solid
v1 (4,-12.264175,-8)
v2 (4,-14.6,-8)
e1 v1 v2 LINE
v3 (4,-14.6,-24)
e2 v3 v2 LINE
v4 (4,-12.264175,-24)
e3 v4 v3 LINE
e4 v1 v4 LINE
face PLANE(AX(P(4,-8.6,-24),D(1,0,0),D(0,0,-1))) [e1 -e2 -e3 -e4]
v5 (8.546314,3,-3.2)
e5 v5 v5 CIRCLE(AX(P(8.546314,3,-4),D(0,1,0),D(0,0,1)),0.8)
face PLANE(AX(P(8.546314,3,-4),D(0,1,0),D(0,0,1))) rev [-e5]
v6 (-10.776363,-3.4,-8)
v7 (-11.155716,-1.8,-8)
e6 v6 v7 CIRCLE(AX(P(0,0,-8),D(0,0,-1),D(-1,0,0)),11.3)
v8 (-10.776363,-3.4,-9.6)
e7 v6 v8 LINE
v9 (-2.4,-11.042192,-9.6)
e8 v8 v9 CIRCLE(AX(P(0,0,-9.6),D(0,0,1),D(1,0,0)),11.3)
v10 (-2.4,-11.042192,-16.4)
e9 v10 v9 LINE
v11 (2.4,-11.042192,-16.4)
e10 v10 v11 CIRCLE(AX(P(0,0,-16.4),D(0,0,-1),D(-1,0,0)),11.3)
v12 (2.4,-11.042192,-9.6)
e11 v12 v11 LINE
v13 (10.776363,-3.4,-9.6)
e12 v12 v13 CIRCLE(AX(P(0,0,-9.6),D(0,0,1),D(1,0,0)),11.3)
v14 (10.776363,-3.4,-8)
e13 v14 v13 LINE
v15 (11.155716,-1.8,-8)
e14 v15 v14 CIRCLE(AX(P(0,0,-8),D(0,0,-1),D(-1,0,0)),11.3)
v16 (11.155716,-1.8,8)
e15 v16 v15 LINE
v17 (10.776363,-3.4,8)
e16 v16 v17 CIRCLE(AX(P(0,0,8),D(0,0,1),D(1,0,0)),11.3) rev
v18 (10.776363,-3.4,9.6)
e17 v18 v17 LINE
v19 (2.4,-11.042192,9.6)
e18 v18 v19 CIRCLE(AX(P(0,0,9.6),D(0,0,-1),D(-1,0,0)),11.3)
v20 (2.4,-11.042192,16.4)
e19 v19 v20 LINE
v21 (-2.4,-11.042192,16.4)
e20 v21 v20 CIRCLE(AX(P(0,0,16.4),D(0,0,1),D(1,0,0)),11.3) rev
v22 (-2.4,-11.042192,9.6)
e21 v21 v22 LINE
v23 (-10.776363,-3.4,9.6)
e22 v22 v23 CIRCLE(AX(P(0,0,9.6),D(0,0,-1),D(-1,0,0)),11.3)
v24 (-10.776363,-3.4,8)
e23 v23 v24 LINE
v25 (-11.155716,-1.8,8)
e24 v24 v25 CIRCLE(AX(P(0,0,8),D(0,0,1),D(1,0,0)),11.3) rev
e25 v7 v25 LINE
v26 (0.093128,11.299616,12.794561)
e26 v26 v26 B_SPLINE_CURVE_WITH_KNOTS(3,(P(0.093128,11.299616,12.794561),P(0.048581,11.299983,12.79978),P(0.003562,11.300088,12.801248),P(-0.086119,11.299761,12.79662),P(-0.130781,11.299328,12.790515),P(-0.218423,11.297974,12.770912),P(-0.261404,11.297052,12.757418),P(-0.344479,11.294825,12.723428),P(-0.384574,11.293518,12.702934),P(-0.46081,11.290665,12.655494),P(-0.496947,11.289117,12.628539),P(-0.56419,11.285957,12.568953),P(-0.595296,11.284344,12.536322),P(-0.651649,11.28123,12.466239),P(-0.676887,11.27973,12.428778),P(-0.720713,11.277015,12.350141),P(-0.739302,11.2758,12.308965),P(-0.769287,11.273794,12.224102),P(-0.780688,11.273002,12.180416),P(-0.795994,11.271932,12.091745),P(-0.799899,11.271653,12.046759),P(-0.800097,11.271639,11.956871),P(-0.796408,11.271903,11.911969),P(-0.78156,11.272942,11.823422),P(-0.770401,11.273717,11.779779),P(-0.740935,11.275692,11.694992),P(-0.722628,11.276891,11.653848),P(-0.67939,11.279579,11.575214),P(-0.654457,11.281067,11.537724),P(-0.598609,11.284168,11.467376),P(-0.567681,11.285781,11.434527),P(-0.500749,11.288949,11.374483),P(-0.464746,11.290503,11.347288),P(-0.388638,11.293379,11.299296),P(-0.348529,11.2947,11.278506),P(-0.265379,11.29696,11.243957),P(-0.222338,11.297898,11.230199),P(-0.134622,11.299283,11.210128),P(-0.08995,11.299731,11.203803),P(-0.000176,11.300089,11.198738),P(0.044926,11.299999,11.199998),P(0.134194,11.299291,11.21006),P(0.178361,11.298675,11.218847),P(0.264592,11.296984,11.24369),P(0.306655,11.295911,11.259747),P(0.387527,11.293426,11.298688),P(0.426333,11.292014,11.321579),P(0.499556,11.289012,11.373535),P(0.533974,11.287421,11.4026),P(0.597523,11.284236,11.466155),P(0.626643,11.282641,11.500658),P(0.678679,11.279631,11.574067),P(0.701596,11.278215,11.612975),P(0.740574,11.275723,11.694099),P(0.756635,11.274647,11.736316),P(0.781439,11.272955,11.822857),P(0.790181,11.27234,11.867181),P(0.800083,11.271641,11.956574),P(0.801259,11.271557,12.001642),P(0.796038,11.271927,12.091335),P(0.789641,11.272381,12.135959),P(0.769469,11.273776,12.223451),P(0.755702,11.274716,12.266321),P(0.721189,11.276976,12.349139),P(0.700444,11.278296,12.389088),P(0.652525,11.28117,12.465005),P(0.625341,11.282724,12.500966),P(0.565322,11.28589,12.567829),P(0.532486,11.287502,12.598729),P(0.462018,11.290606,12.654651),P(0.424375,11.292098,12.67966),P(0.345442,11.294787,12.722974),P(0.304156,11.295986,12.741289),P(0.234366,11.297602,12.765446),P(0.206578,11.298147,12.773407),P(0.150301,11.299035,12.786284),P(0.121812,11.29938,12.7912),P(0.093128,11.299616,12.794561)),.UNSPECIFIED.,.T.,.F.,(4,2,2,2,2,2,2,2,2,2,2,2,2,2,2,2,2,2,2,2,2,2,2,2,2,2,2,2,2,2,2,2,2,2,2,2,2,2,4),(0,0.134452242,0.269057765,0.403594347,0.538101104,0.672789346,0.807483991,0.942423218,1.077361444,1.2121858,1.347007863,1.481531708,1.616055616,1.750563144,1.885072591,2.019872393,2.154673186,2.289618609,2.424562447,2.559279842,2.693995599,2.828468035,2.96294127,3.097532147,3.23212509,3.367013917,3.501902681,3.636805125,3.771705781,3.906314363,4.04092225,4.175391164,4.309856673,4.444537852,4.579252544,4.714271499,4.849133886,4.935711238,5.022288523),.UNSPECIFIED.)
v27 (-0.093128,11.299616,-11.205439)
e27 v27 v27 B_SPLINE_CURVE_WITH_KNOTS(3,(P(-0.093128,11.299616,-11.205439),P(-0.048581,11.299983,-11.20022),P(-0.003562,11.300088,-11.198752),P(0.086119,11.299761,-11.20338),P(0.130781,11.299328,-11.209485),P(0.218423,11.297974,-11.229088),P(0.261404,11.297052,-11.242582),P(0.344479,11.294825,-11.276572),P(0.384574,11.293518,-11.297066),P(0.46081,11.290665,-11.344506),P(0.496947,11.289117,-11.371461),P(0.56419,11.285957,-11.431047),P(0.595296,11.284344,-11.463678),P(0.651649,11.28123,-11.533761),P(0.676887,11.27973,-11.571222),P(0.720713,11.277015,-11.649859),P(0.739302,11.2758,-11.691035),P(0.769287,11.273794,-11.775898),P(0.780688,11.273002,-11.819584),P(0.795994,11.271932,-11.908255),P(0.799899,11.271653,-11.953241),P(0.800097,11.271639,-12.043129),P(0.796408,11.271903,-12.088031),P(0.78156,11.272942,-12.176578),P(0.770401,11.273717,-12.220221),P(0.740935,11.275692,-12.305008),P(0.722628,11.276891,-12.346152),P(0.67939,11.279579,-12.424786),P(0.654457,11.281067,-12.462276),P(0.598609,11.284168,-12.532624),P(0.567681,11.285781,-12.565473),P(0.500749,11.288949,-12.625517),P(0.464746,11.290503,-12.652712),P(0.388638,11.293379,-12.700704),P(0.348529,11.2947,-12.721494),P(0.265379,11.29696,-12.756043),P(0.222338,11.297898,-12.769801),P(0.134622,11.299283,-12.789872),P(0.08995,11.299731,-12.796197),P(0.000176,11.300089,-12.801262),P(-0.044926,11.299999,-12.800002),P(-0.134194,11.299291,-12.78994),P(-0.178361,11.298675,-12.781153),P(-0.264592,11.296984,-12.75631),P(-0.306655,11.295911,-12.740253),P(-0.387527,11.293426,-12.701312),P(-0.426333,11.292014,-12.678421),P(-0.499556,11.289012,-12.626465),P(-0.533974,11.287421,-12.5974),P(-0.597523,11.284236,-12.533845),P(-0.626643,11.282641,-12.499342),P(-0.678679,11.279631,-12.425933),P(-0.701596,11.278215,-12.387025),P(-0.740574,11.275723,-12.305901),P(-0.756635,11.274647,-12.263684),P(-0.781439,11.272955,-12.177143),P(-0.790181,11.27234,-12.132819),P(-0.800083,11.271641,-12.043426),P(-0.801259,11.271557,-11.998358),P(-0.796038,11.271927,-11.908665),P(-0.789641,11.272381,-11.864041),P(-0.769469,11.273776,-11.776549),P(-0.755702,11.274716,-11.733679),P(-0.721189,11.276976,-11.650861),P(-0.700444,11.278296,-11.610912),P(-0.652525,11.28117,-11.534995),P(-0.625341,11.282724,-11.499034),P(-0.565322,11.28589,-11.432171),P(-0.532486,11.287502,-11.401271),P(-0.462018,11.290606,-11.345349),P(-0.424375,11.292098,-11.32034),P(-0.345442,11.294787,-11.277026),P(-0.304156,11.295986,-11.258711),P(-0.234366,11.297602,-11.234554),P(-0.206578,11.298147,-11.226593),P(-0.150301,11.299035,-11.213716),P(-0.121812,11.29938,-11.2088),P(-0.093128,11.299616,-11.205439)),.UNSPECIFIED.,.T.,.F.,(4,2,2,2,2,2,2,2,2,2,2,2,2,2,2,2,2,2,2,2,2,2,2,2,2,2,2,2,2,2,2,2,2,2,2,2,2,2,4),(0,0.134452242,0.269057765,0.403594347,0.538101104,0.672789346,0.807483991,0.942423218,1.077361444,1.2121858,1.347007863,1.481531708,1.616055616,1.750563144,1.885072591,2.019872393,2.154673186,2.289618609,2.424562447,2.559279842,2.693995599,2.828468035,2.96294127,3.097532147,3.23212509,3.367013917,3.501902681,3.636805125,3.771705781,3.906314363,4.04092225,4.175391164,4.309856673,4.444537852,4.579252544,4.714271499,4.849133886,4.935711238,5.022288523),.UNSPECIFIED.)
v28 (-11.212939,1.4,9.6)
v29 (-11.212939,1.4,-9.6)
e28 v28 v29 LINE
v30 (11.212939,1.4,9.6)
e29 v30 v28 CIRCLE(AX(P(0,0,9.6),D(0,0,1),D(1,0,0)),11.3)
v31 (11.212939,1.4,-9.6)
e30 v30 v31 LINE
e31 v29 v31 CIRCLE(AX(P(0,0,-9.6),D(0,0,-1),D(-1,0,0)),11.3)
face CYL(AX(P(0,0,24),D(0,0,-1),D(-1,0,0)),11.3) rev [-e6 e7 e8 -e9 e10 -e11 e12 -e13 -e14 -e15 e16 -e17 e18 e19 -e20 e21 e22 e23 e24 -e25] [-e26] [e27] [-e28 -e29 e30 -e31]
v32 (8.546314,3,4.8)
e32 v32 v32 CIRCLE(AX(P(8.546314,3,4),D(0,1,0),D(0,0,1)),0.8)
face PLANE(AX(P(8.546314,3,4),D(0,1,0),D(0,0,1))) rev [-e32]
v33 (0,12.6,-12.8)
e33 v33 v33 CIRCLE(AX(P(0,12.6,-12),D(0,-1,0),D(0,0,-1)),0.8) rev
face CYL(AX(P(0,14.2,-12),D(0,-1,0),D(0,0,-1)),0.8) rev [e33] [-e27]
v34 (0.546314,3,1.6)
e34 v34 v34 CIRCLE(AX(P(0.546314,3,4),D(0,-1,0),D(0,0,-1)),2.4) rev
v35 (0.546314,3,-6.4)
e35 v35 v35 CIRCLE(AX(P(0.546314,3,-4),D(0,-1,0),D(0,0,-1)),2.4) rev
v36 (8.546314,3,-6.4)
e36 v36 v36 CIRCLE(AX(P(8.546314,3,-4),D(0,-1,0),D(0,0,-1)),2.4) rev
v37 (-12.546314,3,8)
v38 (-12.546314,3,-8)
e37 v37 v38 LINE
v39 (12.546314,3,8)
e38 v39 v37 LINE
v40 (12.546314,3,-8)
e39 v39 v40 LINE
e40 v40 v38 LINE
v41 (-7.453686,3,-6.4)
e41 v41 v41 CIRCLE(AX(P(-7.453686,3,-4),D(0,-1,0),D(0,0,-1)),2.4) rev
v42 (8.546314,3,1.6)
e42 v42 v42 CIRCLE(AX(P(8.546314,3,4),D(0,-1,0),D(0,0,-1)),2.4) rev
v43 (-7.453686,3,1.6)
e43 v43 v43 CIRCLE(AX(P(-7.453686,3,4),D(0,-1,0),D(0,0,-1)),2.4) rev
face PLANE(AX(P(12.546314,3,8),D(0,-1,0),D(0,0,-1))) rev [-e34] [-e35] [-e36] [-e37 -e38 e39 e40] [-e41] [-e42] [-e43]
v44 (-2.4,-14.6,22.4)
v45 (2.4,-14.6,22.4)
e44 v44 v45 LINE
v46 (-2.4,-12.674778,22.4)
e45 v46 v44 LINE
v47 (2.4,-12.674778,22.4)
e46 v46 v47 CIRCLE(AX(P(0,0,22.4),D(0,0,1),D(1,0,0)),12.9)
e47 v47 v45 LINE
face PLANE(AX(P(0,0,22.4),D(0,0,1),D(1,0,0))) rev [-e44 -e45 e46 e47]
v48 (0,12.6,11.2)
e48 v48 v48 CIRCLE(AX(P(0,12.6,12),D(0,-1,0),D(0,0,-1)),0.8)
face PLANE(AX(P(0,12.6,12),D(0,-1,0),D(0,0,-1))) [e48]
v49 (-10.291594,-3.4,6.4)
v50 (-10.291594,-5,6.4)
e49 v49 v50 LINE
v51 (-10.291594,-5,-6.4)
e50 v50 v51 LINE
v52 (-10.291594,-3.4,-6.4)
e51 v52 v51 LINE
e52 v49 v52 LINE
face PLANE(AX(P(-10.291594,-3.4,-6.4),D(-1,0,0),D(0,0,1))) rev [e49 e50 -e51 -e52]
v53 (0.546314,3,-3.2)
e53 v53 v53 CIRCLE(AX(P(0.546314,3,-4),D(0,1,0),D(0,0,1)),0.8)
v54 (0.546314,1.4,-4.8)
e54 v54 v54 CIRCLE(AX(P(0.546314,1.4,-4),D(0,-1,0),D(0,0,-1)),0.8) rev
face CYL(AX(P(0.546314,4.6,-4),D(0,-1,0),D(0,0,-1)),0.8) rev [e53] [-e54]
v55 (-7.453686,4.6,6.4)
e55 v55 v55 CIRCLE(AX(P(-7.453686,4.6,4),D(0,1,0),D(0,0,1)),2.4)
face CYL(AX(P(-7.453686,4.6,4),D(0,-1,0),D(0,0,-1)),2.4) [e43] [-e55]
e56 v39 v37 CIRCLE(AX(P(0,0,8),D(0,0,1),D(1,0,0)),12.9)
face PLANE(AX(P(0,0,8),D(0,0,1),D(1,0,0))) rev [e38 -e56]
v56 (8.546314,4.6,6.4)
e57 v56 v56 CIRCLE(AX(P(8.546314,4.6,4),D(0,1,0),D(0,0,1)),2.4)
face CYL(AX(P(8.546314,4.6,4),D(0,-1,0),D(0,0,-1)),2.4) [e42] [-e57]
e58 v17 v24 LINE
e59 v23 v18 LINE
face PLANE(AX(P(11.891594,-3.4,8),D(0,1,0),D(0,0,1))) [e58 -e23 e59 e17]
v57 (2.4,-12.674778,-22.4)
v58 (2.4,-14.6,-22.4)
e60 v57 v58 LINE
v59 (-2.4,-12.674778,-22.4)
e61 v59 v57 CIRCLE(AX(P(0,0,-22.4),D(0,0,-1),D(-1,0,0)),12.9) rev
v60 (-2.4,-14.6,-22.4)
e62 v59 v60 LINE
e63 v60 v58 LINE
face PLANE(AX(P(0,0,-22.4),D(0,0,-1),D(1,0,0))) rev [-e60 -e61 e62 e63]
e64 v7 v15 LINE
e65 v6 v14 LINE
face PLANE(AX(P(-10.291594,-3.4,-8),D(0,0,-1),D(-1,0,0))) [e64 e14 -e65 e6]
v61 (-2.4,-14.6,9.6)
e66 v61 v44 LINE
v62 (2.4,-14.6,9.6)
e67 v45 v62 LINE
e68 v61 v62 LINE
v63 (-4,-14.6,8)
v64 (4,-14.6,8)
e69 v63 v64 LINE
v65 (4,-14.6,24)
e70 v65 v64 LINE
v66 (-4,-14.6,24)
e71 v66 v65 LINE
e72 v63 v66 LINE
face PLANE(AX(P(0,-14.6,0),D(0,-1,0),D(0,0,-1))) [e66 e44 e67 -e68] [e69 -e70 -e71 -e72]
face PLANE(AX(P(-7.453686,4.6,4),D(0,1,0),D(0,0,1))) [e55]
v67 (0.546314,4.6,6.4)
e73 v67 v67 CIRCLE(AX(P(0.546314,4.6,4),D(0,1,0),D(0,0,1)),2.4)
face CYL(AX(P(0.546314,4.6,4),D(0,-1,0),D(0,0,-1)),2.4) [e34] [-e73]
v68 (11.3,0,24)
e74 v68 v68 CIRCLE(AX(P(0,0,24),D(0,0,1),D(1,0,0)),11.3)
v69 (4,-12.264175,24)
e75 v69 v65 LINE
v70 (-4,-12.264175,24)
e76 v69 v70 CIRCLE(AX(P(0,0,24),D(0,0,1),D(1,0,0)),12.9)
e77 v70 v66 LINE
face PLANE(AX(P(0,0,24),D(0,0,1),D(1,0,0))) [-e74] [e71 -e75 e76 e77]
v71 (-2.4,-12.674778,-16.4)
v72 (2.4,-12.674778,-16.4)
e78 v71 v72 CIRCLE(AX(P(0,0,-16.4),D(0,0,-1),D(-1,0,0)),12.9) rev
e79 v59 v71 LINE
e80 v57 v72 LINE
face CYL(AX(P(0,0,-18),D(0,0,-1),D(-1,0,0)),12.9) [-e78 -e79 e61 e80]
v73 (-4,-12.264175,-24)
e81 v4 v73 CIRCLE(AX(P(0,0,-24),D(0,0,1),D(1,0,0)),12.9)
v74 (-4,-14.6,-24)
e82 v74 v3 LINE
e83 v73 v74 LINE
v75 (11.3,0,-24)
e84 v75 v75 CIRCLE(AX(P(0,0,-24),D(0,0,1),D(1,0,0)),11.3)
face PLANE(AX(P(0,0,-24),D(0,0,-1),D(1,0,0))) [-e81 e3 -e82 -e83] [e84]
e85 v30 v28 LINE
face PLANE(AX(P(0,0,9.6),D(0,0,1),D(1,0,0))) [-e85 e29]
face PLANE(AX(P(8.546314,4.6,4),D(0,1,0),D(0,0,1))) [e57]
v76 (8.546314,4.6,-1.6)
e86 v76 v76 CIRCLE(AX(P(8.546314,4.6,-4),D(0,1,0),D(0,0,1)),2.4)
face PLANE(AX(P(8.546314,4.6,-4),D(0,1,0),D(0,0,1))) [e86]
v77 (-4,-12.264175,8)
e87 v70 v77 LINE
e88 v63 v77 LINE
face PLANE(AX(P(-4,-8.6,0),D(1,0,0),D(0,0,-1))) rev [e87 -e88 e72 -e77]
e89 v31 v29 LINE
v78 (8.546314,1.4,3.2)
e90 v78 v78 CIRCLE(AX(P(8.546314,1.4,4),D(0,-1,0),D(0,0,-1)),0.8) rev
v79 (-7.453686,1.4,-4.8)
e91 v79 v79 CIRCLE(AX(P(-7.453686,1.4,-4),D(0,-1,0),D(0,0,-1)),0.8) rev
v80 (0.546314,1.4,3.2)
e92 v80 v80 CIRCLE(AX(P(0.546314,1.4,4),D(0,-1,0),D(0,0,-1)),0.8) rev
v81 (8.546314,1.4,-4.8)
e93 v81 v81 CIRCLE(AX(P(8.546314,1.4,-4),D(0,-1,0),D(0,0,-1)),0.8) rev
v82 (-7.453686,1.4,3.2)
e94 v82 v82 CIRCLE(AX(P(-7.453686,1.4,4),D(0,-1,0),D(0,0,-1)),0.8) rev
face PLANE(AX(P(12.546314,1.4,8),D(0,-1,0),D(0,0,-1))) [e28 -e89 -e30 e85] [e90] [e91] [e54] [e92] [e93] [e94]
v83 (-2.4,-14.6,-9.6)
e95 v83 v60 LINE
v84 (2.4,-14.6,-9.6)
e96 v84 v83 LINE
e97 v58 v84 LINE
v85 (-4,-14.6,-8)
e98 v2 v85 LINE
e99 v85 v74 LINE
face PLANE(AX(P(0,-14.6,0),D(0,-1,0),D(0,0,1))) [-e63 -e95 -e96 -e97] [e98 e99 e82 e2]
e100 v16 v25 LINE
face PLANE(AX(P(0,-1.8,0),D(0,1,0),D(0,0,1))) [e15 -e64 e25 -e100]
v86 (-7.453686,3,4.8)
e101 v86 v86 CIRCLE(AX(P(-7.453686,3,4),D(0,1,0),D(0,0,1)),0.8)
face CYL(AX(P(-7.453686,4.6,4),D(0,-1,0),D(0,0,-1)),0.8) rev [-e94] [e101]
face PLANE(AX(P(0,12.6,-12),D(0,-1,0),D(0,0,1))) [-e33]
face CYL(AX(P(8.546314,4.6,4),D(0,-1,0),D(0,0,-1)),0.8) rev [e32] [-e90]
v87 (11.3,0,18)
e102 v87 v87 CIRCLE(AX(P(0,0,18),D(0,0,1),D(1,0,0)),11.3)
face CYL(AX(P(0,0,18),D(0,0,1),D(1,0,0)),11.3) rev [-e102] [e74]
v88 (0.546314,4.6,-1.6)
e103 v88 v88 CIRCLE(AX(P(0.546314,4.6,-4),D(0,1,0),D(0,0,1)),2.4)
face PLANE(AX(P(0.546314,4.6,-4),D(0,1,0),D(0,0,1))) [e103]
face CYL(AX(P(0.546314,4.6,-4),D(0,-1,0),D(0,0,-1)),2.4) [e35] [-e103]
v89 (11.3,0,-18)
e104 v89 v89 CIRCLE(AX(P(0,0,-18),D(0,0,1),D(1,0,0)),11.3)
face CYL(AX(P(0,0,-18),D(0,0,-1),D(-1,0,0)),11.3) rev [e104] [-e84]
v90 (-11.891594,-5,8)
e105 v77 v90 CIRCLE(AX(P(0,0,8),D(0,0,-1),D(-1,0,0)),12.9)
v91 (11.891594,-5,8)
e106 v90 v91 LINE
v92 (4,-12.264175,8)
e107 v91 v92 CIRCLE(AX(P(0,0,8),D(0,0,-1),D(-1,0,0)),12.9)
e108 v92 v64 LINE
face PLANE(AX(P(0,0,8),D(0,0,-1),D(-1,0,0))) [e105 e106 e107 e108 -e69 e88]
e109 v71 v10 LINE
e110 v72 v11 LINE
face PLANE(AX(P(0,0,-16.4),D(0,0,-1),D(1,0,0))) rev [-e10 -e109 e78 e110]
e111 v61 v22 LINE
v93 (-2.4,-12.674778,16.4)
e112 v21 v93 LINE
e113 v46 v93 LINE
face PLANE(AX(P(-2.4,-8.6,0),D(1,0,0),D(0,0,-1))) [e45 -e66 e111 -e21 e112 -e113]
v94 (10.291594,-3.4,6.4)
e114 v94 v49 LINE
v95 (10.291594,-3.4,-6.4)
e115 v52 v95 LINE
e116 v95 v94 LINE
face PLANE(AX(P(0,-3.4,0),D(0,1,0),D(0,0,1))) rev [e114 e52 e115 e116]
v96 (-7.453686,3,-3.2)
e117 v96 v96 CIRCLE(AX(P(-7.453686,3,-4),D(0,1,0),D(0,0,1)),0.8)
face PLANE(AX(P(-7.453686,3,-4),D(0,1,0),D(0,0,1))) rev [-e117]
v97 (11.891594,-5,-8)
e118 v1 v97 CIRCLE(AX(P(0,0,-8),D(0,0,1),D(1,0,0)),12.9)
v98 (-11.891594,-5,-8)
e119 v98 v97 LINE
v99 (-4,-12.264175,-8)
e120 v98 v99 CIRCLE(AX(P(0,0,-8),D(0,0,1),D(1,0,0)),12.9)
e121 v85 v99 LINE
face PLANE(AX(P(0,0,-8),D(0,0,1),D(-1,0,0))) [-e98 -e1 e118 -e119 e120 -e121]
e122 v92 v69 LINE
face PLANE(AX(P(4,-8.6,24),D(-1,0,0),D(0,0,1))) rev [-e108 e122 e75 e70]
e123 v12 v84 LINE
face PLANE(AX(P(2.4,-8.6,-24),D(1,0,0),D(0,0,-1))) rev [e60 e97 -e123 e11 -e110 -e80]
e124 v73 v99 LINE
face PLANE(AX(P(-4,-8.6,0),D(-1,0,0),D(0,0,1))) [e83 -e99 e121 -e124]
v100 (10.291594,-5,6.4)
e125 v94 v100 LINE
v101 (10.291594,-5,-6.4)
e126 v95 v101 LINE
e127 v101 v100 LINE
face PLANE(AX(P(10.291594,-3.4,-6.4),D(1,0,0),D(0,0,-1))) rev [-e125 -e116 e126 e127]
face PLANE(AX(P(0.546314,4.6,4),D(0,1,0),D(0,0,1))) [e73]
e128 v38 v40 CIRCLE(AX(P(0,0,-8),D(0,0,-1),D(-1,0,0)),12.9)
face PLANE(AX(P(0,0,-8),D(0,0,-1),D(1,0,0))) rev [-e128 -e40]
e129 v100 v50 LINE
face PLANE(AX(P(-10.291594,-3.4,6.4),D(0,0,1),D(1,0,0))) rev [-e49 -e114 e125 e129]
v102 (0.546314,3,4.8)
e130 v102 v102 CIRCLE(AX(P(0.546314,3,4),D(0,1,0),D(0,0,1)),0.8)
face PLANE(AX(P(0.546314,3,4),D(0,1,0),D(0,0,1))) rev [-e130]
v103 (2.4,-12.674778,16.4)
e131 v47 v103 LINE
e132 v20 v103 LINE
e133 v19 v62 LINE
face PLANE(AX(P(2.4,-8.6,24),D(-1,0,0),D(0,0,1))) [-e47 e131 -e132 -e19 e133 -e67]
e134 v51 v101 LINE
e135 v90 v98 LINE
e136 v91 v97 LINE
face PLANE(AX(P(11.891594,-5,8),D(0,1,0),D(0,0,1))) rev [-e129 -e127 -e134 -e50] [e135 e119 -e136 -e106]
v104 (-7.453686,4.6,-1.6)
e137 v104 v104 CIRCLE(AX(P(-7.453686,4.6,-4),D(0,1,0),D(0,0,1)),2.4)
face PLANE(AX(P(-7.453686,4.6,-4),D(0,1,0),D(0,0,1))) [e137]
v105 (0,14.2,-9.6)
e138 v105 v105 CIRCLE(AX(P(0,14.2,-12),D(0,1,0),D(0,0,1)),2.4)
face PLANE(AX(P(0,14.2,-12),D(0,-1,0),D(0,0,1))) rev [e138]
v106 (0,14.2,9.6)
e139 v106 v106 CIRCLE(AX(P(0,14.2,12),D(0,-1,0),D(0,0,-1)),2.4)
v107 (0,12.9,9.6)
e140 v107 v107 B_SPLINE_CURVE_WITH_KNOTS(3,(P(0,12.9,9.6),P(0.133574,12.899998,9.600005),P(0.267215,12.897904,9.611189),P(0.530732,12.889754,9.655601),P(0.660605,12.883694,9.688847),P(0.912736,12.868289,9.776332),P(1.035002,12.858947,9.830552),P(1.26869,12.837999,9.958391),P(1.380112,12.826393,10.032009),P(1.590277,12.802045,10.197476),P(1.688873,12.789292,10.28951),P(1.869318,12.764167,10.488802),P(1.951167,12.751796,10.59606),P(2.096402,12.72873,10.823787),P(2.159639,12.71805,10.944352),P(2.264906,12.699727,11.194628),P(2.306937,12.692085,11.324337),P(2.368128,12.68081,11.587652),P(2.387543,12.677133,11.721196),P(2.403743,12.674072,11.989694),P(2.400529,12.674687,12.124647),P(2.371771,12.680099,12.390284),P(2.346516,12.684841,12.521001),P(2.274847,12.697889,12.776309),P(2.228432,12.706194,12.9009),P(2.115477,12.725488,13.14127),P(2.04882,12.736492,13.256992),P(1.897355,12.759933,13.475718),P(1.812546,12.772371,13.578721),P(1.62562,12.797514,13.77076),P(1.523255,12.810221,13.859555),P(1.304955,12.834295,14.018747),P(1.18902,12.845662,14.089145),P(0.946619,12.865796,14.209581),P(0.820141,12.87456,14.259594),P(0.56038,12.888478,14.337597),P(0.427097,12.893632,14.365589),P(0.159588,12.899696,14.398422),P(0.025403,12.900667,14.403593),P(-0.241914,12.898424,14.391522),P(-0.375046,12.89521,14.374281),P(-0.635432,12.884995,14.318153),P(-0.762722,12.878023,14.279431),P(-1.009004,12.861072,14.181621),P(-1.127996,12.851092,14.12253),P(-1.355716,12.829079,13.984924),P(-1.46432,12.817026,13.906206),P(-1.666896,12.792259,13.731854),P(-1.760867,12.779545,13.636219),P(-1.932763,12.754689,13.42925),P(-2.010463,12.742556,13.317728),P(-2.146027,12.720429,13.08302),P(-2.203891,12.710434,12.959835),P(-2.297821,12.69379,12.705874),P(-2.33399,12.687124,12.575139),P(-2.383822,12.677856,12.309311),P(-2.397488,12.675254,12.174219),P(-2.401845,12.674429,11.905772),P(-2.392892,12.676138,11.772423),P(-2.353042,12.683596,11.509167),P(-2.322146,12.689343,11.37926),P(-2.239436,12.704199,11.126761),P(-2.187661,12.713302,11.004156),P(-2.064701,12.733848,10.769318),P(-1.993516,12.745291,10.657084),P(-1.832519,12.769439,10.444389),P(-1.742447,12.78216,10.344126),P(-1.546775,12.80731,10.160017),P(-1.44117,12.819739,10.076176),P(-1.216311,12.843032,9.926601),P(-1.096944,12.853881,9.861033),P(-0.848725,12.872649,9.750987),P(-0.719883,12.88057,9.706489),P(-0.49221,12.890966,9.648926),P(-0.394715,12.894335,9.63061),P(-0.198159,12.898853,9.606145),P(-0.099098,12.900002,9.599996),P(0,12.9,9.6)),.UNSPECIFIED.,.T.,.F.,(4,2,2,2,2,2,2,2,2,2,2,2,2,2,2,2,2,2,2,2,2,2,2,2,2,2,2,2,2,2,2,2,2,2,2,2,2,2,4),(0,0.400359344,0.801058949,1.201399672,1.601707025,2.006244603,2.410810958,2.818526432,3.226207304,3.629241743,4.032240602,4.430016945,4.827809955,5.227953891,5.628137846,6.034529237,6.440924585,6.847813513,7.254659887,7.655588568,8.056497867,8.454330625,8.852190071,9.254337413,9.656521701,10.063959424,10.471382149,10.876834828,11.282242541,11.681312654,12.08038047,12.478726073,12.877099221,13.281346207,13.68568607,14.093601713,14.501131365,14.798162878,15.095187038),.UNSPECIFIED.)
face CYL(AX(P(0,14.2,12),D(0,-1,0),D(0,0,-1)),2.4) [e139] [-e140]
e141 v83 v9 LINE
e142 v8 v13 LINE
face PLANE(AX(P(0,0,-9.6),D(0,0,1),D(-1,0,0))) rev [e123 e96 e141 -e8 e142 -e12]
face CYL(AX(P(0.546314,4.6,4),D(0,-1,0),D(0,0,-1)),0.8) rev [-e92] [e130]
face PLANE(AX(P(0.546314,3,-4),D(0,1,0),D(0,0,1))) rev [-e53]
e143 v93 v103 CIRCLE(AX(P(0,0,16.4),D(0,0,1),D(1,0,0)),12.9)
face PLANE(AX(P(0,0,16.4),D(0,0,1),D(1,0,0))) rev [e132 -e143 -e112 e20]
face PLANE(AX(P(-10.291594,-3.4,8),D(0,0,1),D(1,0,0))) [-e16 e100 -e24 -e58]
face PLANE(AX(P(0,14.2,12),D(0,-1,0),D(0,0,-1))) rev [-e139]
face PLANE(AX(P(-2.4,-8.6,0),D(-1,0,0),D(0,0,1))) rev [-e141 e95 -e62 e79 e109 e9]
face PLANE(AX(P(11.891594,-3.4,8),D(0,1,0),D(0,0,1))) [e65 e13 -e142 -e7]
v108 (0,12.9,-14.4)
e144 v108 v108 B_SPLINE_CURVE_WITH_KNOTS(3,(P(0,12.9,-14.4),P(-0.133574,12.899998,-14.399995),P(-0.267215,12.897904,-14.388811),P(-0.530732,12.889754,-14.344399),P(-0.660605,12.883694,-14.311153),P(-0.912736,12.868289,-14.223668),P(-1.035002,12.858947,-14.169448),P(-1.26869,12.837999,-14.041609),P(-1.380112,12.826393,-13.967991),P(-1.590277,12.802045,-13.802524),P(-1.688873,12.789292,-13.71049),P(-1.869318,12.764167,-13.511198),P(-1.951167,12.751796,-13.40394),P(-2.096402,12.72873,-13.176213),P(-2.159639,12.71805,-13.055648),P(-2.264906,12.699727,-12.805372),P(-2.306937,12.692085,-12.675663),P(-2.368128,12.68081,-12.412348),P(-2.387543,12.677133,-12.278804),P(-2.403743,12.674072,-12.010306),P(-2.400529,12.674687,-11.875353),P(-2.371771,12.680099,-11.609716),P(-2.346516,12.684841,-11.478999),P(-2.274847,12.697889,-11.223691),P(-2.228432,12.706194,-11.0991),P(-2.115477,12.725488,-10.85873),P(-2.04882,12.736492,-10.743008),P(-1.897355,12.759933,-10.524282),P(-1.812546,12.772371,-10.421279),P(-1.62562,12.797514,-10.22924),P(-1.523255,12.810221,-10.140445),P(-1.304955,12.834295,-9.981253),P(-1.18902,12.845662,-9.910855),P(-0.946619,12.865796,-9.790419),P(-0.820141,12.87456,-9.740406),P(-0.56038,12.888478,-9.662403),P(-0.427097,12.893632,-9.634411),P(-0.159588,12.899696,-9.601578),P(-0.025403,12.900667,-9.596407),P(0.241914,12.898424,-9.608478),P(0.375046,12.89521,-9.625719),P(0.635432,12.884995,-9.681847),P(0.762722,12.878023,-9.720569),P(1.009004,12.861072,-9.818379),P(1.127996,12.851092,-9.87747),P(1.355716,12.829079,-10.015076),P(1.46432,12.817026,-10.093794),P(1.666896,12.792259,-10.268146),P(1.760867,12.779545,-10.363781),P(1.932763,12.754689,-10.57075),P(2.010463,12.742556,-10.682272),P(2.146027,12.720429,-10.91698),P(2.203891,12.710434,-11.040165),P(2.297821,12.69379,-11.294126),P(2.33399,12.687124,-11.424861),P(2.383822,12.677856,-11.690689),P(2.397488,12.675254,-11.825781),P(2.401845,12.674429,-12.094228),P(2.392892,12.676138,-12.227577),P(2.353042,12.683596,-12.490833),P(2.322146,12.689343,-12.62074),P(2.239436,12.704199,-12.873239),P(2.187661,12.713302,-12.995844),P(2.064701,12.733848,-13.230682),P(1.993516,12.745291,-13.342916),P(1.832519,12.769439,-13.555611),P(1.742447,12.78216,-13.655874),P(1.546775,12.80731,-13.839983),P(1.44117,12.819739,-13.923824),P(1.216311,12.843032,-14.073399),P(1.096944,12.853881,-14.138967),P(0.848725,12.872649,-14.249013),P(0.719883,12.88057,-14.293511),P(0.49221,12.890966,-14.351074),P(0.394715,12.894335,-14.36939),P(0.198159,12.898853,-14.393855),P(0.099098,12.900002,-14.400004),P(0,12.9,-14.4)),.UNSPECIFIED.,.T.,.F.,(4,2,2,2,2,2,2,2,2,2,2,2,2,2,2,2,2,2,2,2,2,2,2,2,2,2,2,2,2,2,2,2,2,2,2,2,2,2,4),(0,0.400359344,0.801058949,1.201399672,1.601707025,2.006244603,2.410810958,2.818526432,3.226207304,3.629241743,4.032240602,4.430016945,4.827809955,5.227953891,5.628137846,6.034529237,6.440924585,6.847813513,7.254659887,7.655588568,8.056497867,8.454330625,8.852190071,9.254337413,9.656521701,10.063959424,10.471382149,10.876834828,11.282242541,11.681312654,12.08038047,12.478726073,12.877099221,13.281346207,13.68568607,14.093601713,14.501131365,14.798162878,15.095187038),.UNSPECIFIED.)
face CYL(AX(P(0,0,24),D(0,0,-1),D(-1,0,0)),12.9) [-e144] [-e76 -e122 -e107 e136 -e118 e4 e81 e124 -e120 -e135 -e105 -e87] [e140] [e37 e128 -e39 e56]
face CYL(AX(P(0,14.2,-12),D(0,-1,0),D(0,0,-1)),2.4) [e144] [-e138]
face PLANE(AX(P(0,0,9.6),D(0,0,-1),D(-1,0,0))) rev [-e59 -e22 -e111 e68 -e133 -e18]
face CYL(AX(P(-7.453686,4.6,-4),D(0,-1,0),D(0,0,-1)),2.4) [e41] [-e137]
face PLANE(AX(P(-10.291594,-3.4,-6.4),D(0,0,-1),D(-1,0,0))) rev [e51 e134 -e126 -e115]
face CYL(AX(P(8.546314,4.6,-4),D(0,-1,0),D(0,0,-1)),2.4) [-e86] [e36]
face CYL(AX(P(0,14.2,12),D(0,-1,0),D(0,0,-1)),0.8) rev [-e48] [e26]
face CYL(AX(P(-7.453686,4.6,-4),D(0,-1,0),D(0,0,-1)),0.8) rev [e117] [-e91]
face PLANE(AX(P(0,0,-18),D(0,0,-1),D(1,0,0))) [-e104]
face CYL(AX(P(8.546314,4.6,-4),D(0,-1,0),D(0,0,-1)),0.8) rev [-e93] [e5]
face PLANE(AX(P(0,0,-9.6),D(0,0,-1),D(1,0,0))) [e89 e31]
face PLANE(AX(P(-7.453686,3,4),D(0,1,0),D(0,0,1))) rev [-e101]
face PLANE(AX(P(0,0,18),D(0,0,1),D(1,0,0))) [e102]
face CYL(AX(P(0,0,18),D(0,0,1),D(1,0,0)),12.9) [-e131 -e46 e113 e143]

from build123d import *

# Parameters (mm, degrees)
SKETCH3_R            = 12.9
BOSS_EXTRUDE3_DEPTH  = 24
SKETCH5_W            = 8
SKETCH5_H            = 24
BOSS_EXTRUDE4_DEPTH  = 6
SKETCH7_R            = 2.4
BOSS_EXTRUDE5_DEPTH  = 28.8
SKETCH6_R            = 11.3
CUT_EXTRUDE1_DEPTH   = 6
REFERENCEW_W         = 23.783187338
REFERENCEW_H         = 9.6
REFERENCEW_W_2       = 25.0926284
REFERENCEW_H_2       = 9.9
CUT_EXTRUDE2_DEPTH   = 8
SKETCH8_R            = 2.4
BOSS_EXTRUDE6_DEPTH  = 1.6
LPATTERN1_COUNT      = 3
LPATTERN1_PITCH      = 8
LPATTERN1_COUNT_DIR2 = 2
LPATTERN1_PITCH_DIR2 = 8
SKETCH9_W            = 20.583187338
SKETCH9_H            = 12.8
CUT_EXTRUDE3_DEPTH   = 1.6
SHELL1_START         = -14.6
SHELL1_OUTLINE_W     = 4.8
SHELL1_OUTLINE_H     = 6.8
SHELL1_DEPTH         = 17.6
SHELL1_2_OUTLINE_W   = 4.8
SHELL1_2_OUTLINE_H   = 6
SHELL1_2_DEPTH       = 1.7
SHELL1_START_2       = -1.8
SHELL1_3_OUTLINE_R   = 0.8
SHELL1_3_DEPTH       = 4.8
SHELL1_START_3       = 3
SHELL1_4_OUTLINE_R   = 0.8
SHELL1_4_DEPTH       = 9.6
SHELL1_START_4       = -16.4
SHELL1_5_DEPTH       = 6.8
SHELL1_START_5       = 9.6
SHELL1_6_DEPTH       = 6.8
SHELL1_START_6       = -9.6
SHELL1_7_DEPTH       = 19.2
SHELL1_8_DEPTH       = 1.6
SHELL1_START_7       = 8
SHELL1_9_DEPTH       = 1.6
SHELL1_START_8       = -22.4
SHELL1_10_DEPTH      = 6
SHELL1_START_9       = 16.4
SHELL1_11_DEPTH      = 6


with BuildPart() as part:
    # Sketch3 → Boss-Extrude3 (new body)
    with BuildSketch(Plane.XY):
        Circle(SKETCH3_R)
    boss_extrude3 = extrude(amount=BOSS_EXTRUDE3_DEPTH)

    # Sketch5 → Boss-Extrude4 (add)
    with BuildSketch(Plane(origin=(0, -14.6, 0), x_dir=(1, 0, 0), z_dir=(0, 1, 0))):
        with Locations((0, -12)):
            Rectangle(SKETCH5_W, SKETCH5_H)
    boss_extrude4 = extrude(amount=BOSS_EXTRUDE4_DEPTH)

    # Sketch7 → Boss-Extrude5 (add)
    with BuildSketch(Plane.XZ.offset(14.6)):
        with Locations(Location((0, 12, 0), (0, 0, 270))):
            Circle(SKETCH7_R)
    boss_extrude5 = extrude(amount=-BOSS_EXTRUDE5_DEPTH)

    # Sketch6 → Cut-Extrude1 (cut)
    with BuildSketch(Plane.XY.offset(24)):
        Circle(SKETCH6_R)
    cut_extrude1 = extrude(amount=-CUT_EXTRUDE1_DEPTH, mode=Mode.SUBTRACT)

    # referencew → Cut-Extrude2 (cut)
    with BuildSketch(Plane(origin=(0, 0, 0), x_dir=(-1, 0, 0), z_dir=(0, 0, -1))):
        with Locations((0, -9.8)):
            Rectangle(REFERENCEW_W, REFERENCEW_H)
        with Locations((0, 7.95)):
            Rectangle(REFERENCEW_W_2, REFERENCEW_H_2)
    cut_extrude2 = extrude(amount=-CUT_EXTRUDE2_DEPTH, mode=Mode.SUBTRACT)

    # Mirror1: Boss-Extrude3, Boss-Extrude4, Boss-Extrude5, Cut-Extrude1, Cut-Extrude2 across Front Plane
    add(boss_extrude3.mirror(Plane.XY))
    add(boss_extrude4.mirror(Plane.XY))
    add(boss_extrude5.mirror(Plane.XY))
    add(cut_extrude1.mirror(Plane.XY), mode=Mode.SUBTRACT)
    add(cut_extrude2.mirror(Plane.XY), mode=Mode.SUBTRACT)

    # Sketch8 → Boss-Extrude6 (add)
    with BuildSketch(Plane(origin=(0, 3, 0), x_dir=(1, 0, 0), z_dir=(0, 1, 0))):
        with Locations(Location((8.5463142, 4, 0), (0, 0, 90))):
            Circle(SKETCH8_R)
    boss_extrude6 = extrude(amount=BOSS_EXTRUDE6_DEPTH)

    # LPattern1: Boss-Extrude6 3 × 2
    with Locations(*[(-i * LPATTERN1_PITCH, 0, j * LPATTERN1_PITCH_DIR2) for i in range(LPATTERN1_COUNT) for j in range(LPATTERN1_COUNT_DIR2) if (i, j) != (0, 0)]):
        add(boss_extrude6)

    # Sketch9 → Cut-Extrude3 (cut)
    with BuildSketch(Plane.XZ.offset(5)):
        Rectangle(SKETCH9_W, SKETCH9_H)
    extrude(amount=-CUT_EXTRUDE3_DEPTH, mode=Mode.SUBTRACT)

    # Shell1: read off the stored shape, not the designer's step
    # Shell1 outline → Shell1 (cut)
    with BuildSketch(Plane(origin=(0, 0, 0), x_dir=(1, 0, 0), z_dir=(0, 1, 0)).offset(SHELL1_START)):
        with Locations((0, 13)):
            Rectangle(SHELL1_OUTLINE_W, SHELL1_OUTLINE_H)
        with Locations((0, -13)):
            Rectangle(SHELL1_OUTLINE_W, SHELL1_OUTLINE_H)
    extrude(amount=SHELL1_DEPTH, mode=Mode.SUBTRACT)

    # Shell1 2 outline → Shell1 2 (cut)
    with BuildSketch(Plane(origin=(0, 0, 0), x_dir=(1, 0, 0), z_dir=(0, 1, 0)).offset(SHELL1_START)):
        with Locations((0, 19.4)):
            Rectangle(SHELL1_2_OUTLINE_W, SHELL1_2_OUTLINE_H)
        with Locations((0, -19.4)):
            Rectangle(SHELL1_2_OUTLINE_W, SHELL1_2_OUTLINE_H)
    extrude(amount=SHELL1_2_DEPTH, mode=Mode.SUBTRACT)

    # Shell1 3 outline → Shell1 3 (cut)
    with BuildSketch(Plane(origin=(0, 0, 0), x_dir=(1, 0, 0), z_dir=(0, 1, 0)).offset(SHELL1_START_2)):
        with Locations((8.5463142, 4)):
            Circle(SHELL1_3_OUTLINE_R)
        with Locations((8.5463142, -4)):
            Circle(SHELL1_3_OUTLINE_R)
        with Locations((0.5463142, 4)):
            Circle(SHELL1_3_OUTLINE_R)
        with Locations((0.5463142, -4)):
            Circle(SHELL1_3_OUTLINE_R)
        with Locations((-7.4536858, 4)):
            Circle(SHELL1_3_OUTLINE_R)
        with Locations((-7.4536858, -4)):
            Circle(SHELL1_3_OUTLINE_R)
    extrude(amount=SHELL1_3_DEPTH, mode=Mode.SUBTRACT)

    # Shell1 4 outline → Shell1 4 (cut)
    with BuildSketch(Plane(origin=(0, 0, 0), x_dir=(1, 0, 0), z_dir=(0, 1, 0)).offset(SHELL1_START_3)):
        with Locations((0, -12)):
            Circle(SHELL1_4_OUTLINE_R)
        with Locations((0, 12)):
            Circle(SHELL1_4_OUTLINE_R)
    extrude(amount=SHELL1_4_DEPTH, mode=Mode.SUBTRACT)

    # Shell1 5 outline → Shell1 5 (cut)
    with BuildSketch(Plane.XY.offset(SHELL1_START_4)):
        with BuildLine():
            Line((-2.4, -11.042191811), (-2.4, 3))
            Line((-2.4, 3), (2.4, 3))
            Line((2.4, 3), (2.4, -11.042191811))
            ThreePointArc((2.4, -11.042191811), (0, 11.3), (-2.4, -11.042191811))
        make_face()
    extrude(amount=SHELL1_5_DEPTH, mode=Mode.SUBTRACT)

    # Shell1 6 outline → Shell1 6 (cut)
    with BuildSketch(Plane.XY.offset(SHELL1_START_5)):
        with BuildLine():
            Line((-2.4, -11.042191811), (-2.4, 3))
            Line((-2.4, 3), (2.4, 3))
            Line((2.4, 3), (2.4, -11.042191811))
            ThreePointArc((2.4, -11.042191811), (0, 11.3), (-2.4, -11.042191811))
        make_face()
    extrude(amount=SHELL1_6_DEPTH, mode=Mode.SUBTRACT)

    # Shell1 7 outline → Shell1 7 (cut)
    with BuildSketch(Plane.XY.offset(SHELL1_START_6)):
        with BuildLine():
            ThreePointArc((-11.212938954, 1.4), (-11.298193722, -0.202036175), (-11.155716023, -1.8))
            Line((-11.155716023, -1.8), (11.155716023, -1.8))
            ThreePointArc((11.155716023, -1.8), (11.298193722, -0.202036175), (11.212938954, 1.4))
            Line((11.212938954, 1.4), (-11.212938954, 1.4))
        make_face()
    extrude(amount=SHELL1_7_DEPTH, mode=Mode.SUBTRACT)

    # Shell1 8 outline → Shell1 8 (cut)
    with BuildSketch(Plane.XY.offset(SHELL1_START_6)):
        with BuildLine():
            ThreePointArc((-11.155716023, -1.8), (-10.9951818, -2.606909506), (-10.776363023, -3.4))
            Line((-10.776363023, -3.4), (10.776363023, -3.4))
            ThreePointArc((10.776363023, -3.4), (10.9951818, -2.606909506), (11.155716023, -1.8))
            Line((11.155716023, -1.8), (-11.155716023, -1.8))
        make_face()
    extrude(amount=SHELL1_8_DEPTH, mode=Mode.SUBTRACT)

    # Shell1 9 outline → Shell1 9 (cut)
    with BuildSketch(Plane.XY.offset(SHELL1_START_7)):
        with BuildLine():
            ThreePointArc((-11.155716023, -1.8), (-10.9951818, -2.606909506), (-10.776363023, -3.4))
            Line((-10.776363023, -3.4), (10.776363023, -3.4))
            ThreePointArc((10.776363023, -3.4), (10.9951818, -2.606909506), (11.155716023, -1.8))
            Line((11.155716023, -1.8), (-11.155716023, -1.8))
        make_face()
    extrude(amount=SHELL1_9_DEPTH, mode=Mode.SUBTRACT)

    # Shell1 10 outline → Shell1 10 (cut)
    with BuildSketch(Plane.XY.offset(SHELL1_START_8)):
        with BuildLine():
            ThreePointArc((0, -12.9), (-1.205272262, -12.843571107), (-2.4, -12.674778105))
            Line((-2.4, -12.674778105), (-2.4, -12.9))
            Line((-2.4, -12.9), (0, -12.9))
        make_face()
        with BuildLine():
            ThreePointArc((2.4, -12.674778105), (1.205272262, -12.843571107), (0, -12.9))
            Line((0, -12.9), (2.4, -12.9))
            Line((2.4, -12.9), (2.4, -12.674778105))
        make_face()
    extrude(amount=SHELL1_10_DEPTH, mode=Mode.SUBTRACT)

    # Shell1 11 outline → Shell1 11 (cut)
    with BuildSketch(Plane.XY.offset(SHELL1_START_9)):
        with BuildLine():
            ThreePointArc((0, -12.9), (-1.205272262, -12.843571107), (-2.4, -12.674778105))
            Line((-2.4, -12.674778105), (-2.4, -12.9))
            Line((-2.4, -12.9), (0, -12.9))
        make_face()
        with BuildLine():
            ThreePointArc((2.4, -12.674778105), (1.205272262, -12.843571107), (0, -12.9))
            Line((0, -12.9), (2.4, -12.9))
            Line((2.4, -12.9), (2.4, -12.674778105))
        make_face()
    extrude(amount=SHELL1_11_DEPTH, mode=Mode.SUBTRACT)


solid = part.part
